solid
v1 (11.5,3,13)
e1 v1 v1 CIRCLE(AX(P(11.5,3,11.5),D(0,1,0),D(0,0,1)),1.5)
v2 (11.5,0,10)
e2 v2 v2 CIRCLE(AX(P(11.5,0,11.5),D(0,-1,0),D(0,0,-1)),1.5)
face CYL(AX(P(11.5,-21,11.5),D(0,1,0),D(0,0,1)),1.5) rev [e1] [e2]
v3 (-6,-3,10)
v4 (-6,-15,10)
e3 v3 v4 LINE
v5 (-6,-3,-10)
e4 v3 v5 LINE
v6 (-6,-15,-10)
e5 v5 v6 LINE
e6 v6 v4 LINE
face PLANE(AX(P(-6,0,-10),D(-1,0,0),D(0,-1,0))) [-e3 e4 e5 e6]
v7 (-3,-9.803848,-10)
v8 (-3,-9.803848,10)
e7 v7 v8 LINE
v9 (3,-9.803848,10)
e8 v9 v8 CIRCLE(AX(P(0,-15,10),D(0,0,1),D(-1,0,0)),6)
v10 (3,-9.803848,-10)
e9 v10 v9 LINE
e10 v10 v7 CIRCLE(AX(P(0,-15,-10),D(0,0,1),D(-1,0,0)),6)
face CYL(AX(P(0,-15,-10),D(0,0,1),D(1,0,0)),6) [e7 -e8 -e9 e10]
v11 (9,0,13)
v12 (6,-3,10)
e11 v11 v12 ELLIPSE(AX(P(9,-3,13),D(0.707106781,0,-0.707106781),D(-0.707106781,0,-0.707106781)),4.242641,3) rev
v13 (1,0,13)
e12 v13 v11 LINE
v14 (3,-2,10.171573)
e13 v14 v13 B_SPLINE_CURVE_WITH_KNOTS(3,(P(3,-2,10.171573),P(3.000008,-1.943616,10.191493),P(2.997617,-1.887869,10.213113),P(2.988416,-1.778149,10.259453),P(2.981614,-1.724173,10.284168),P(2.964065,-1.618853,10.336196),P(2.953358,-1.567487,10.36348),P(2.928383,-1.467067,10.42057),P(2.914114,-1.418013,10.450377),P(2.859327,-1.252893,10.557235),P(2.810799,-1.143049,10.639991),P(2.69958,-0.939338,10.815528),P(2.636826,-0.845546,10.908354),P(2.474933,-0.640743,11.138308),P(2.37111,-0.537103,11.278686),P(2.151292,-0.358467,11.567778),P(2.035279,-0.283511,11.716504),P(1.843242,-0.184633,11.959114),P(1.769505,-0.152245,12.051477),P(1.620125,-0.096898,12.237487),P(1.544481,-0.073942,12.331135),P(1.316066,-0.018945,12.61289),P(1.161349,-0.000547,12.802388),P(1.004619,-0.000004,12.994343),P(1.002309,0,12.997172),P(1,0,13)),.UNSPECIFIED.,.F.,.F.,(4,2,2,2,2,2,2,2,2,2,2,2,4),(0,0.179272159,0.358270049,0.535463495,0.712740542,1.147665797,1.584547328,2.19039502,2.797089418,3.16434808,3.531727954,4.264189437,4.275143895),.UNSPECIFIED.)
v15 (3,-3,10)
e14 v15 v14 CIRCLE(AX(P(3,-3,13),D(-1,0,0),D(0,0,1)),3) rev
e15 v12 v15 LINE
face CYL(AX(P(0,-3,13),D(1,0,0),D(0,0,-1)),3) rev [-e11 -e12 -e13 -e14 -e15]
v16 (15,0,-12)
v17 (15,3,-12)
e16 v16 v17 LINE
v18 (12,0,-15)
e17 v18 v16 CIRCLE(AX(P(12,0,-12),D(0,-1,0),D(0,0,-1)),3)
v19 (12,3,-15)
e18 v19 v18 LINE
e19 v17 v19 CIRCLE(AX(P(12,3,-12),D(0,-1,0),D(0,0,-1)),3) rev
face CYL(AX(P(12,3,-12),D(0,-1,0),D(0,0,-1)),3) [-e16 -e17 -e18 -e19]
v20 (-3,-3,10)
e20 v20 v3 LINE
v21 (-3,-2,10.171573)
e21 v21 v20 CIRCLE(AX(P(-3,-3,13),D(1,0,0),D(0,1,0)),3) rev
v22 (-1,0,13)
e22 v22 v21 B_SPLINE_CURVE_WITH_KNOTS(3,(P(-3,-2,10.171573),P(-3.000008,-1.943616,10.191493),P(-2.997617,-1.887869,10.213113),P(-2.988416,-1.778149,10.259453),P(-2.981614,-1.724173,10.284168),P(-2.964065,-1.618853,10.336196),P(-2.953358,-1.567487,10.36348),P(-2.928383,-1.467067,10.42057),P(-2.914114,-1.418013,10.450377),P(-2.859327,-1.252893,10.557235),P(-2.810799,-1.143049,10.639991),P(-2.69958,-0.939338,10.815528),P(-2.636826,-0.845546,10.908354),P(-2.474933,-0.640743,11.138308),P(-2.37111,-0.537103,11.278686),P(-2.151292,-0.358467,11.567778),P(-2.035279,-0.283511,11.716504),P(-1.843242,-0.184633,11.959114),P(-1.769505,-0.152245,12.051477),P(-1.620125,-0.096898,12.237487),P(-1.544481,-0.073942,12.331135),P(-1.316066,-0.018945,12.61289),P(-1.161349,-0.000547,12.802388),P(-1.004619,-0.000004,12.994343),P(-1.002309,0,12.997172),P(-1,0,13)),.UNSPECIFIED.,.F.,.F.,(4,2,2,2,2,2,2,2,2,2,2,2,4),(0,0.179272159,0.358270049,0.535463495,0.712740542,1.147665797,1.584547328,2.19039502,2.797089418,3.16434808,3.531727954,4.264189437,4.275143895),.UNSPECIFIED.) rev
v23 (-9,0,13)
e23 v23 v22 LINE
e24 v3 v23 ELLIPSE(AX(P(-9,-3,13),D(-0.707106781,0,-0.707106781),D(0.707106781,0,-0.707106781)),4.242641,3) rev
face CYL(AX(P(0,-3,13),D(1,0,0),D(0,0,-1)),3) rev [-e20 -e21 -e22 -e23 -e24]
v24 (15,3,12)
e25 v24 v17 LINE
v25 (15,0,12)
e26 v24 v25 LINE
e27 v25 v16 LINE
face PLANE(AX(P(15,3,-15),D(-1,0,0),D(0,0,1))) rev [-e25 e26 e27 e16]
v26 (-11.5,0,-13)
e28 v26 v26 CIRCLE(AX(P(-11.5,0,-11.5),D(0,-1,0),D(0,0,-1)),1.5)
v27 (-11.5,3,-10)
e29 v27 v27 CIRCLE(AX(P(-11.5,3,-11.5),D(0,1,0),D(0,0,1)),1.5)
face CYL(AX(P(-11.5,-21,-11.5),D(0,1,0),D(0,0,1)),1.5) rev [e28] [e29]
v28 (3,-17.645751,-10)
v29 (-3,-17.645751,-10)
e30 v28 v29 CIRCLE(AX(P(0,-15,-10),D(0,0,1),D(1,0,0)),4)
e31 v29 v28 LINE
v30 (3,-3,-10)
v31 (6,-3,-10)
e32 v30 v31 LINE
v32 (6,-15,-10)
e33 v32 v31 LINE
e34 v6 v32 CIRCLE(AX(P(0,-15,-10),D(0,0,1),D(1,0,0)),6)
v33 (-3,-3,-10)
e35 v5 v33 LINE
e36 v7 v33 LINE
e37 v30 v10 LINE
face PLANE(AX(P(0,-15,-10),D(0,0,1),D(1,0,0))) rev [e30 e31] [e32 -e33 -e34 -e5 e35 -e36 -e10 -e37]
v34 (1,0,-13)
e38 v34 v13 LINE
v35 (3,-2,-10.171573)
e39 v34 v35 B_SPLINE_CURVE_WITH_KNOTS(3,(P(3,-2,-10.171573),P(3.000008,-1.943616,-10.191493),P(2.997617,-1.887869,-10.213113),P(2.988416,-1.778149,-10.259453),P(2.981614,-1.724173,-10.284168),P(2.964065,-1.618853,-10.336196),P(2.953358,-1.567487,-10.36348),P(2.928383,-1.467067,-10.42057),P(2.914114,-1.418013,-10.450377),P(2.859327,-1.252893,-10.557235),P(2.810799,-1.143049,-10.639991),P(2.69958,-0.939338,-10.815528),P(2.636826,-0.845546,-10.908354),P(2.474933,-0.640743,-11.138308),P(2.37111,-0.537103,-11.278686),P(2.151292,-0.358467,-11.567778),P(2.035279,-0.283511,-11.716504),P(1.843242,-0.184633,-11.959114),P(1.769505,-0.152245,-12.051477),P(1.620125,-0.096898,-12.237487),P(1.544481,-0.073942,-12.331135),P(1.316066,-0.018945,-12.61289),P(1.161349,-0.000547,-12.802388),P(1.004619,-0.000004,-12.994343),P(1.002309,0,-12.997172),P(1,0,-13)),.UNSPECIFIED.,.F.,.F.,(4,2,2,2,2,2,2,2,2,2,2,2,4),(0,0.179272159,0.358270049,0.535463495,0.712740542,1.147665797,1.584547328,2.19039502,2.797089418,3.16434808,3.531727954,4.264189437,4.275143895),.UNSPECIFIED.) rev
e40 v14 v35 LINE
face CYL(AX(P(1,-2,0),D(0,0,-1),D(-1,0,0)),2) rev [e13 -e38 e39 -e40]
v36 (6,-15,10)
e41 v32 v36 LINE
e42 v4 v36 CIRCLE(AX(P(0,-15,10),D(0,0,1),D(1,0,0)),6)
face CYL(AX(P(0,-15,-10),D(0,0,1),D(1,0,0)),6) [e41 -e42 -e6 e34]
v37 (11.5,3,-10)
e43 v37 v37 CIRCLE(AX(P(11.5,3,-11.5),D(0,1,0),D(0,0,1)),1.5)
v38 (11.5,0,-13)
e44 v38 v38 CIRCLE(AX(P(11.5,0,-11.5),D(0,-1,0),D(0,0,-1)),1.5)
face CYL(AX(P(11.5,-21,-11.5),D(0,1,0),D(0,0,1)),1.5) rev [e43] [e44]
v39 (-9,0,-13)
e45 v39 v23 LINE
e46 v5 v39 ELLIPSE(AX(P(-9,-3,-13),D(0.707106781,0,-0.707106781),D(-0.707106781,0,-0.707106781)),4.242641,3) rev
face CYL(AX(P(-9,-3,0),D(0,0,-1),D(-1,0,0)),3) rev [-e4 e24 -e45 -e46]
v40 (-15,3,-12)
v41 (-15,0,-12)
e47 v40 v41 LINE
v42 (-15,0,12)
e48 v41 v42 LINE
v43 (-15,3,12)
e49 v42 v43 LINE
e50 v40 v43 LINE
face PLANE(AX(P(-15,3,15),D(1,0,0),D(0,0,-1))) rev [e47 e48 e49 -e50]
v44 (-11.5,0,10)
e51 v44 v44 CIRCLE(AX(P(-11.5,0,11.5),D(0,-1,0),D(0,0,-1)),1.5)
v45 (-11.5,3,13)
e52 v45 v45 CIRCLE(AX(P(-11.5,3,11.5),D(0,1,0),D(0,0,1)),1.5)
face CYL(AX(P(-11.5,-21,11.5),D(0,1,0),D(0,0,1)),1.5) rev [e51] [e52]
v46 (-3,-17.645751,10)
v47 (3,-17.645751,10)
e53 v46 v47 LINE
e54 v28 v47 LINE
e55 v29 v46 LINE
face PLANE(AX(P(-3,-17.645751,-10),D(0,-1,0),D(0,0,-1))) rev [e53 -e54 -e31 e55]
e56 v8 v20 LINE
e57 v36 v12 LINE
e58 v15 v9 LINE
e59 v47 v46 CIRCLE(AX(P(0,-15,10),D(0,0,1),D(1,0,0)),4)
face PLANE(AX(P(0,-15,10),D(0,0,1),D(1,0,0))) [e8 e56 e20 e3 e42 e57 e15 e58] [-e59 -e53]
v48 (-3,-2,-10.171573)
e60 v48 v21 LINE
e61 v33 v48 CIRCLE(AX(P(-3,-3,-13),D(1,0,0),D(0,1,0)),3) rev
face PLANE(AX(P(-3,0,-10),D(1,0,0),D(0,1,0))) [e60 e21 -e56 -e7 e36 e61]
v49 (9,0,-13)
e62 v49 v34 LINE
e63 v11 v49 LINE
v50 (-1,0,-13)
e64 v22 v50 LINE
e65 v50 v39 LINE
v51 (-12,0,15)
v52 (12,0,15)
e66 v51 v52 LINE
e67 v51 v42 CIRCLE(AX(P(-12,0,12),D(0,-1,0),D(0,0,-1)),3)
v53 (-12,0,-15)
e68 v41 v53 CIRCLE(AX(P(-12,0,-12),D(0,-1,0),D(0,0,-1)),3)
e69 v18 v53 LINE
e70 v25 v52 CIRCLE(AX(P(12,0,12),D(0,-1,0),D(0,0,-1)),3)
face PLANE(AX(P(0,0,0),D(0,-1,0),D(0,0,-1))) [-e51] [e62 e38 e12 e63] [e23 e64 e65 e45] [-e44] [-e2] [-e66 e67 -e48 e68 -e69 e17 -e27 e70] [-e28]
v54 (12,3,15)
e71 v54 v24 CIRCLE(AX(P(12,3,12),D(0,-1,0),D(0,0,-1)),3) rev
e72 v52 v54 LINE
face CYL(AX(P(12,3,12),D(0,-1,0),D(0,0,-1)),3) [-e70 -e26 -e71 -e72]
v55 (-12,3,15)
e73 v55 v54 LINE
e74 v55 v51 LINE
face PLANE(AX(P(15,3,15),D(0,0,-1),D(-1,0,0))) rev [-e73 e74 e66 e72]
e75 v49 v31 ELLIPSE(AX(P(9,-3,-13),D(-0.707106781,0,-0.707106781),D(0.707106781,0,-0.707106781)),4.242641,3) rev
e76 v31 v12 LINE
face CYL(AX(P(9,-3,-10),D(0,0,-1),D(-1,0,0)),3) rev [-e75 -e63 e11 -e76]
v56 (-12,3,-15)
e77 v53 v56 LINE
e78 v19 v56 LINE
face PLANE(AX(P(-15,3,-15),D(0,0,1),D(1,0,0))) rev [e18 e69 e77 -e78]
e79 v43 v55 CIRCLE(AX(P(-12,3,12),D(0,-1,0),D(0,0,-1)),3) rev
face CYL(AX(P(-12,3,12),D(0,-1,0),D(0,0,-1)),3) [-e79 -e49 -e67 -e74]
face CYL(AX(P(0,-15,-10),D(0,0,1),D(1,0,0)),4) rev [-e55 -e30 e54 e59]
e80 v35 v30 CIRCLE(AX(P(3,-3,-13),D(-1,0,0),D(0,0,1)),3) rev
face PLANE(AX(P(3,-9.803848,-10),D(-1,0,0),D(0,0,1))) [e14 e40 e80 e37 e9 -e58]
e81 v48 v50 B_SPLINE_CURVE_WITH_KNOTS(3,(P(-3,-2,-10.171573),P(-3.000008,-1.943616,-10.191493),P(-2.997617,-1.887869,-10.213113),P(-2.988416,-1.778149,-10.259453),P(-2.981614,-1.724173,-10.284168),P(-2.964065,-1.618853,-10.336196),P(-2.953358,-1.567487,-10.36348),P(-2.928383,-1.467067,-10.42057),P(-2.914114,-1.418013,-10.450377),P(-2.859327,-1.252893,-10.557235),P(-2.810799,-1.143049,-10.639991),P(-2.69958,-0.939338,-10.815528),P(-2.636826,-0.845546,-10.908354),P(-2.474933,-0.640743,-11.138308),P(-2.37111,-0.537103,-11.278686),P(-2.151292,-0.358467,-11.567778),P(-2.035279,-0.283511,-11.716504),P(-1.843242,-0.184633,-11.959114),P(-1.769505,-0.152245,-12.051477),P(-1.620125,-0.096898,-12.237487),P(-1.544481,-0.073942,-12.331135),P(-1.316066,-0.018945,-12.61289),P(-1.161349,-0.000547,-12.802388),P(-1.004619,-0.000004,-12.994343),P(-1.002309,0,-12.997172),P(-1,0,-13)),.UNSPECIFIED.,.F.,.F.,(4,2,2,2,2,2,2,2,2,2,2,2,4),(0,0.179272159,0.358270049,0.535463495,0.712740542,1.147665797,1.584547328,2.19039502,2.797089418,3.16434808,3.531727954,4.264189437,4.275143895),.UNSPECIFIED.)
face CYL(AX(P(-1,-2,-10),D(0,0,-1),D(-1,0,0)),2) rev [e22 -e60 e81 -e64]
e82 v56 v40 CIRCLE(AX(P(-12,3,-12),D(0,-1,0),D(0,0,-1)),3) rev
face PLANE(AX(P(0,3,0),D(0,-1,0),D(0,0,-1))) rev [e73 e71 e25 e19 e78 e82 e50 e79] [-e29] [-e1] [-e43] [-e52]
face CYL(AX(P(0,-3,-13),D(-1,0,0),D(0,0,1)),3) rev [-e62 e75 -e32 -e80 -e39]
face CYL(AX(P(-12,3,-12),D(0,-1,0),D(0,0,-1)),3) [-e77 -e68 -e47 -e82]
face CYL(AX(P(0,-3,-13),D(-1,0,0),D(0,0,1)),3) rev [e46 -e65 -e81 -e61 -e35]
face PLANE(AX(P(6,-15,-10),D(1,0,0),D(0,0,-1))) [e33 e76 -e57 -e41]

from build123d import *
from build123d.topology import SkipClean

# Parameters (mm, degrees)
CROQUIS1_W              = 30
CROQUIS1_H              = 30
SALIENTE_EXTRUIR1_DEPTH = 3
SALIENTE_EXTRUIR2_DEPTH = 20
CROQUIS4_R              = 1.5
CORTAR_EXTRUIR1_DEPTH   = 33.031234756
REDONDEO2_R             = 3
REDONDEO4_R             = 2
REDONDEO5_START         = -6
REDONDEO5_DEPTH         = 3
REDONDEO5_START_2       = 3
REDONDEO5_2_DEPTH       = 3
REDONDEO5_START_3       = -13.0000001
REDONDEO5_3_DEPTH       = 26.0000001
REDONDEO5_START_4       = -10
REDONDEO5_4_DEPTH       = 20


with BuildPart() as part:
    # Croquis1 → Saliente-Extruir1 (new body)
    with BuildSketch(Plane(origin=(0, 0, 0), x_dir=(1, 0, 0), z_dir=(0, 1, 0))):
        Rectangle(CROQUIS1_W, CROQUIS1_H)
    extrude(amount=SALIENTE_EXTRUIR1_DEPTH)

    # Croquis3 → Saliente-Extruir2 (add)
    with BuildSketch(Plane.XY.offset(10)):
        with BuildLine():
            Line((-3, 0), (-3, -9.803847577))
            ThreePointArc((-3, -9.803847577), (0, -9), (3, -9.803847577))
            Line((3, -9.803847577), (3, 0))
            Line((3, 0), (6, 0))
            Line((6, 0), (6, -15))
            ThreePointArc((6, -15), (0, -21), (-6, -15))
            Line((-6, -15), (-6, 0))
            Line((-6, 0), (-3, 0))
        make_face()
        with BuildLine():
            Line((-3, -17.645751311), (3, -17.645751311))
            ThreePointArc((3, -17.645751311), (0, -11), (-3, -17.645751311))
        make_face(mode=Mode.SUBTRACT)
    extrude(amount=-SALIENTE_EXTRUIR2_DEPTH)

    # Croquis4 → Cortar-Extruir1 (cut, through all)
    with BuildSketch(Plane(origin=(0, 3, 0), x_dir=(1, 0, 0), z_dir=(0, 1, 0))):
        with Locations(Location((-11.5, 11.5, 0), (0, 0, 270))):
            Circle(CROQUIS4_R)
        with Locations(Location((11.5, 11.5, 0), (0, 0, 270))):
            Circle(CROQUIS4_R)
        with Locations(Location((11.5, -11.5, 0), (0, 0, 270))):
            Circle(CROQUIS4_R)
        with Locations(Location((-11.5, -11.5, 0), (0, 0, 270))):
            Circle(CROQUIS4_R)
    extrude(amount=-CORTAR_EXTRUIR1_DEPTH, mode=Mode.SUBTRACT)

    # Redondeo2
    redondeo2_edges = [part.edges().sort_by_distance(p)[0] for p in [
        (-15, 1.5, -15),
        (15, 1.5, -15),
        (15, 1.5, 15),
        (-15, 1.5, 15),
    ]]
    fillet(redondeo2_edges, radius=REDONDEO2_R)

    # Redondeo4
    redondeo4_edges = [part.edges().sort_by_distance(p)[0] for p in [
        (-3, 0, 0),
        (3, 0, 0),
    ]]
    fillet(redondeo4_edges, radius=REDONDEO4_R)

    # Redondeo5: read off the stored shape, not the designer's step
    # Redondeo5 outline → Redondeo5 (add)
    with BuildSketch(Plane.YZ.offset(REDONDEO5_START)):
        with BuildLine():
            Line((0, -13), (0, -10))
            Line((0, -10), (-3, -10))
            ThreePointArc((-3, -10), (-0.878679656, -10.878679656), (0, -13))
        make_face()
        with BuildLine():
            ThreePointArc((0, 13), (-0.878679656, 10.878679656), (-3, 10))
            Line((-3, 10), (0, 10))
            Line((0, 10), (0, 13))
        make_face()
    extrude(amount=REDONDEO5_DEPTH)

    # Redondeo5 2 outline → Redondeo5 2 (add)
    with BuildSketch(Plane.YZ.offset(REDONDEO5_START_2)):
        with BuildLine():
            Line((0, -13), (0, -10))
            Line((0, -10), (-3, -10))
            ThreePointArc((-3, -10), (-0.878679656, -10.878679656), (0, -13))
        make_face()
        with BuildLine():
            ThreePointArc((0, 13), (-0.878679656, 10.878679656), (-3, 10))
            Line((-3, 10), (0, 10))
            Line((0, 10), (0, 13))
        make_face()
    extrude(amount=REDONDEO5_2_DEPTH)

    # Redondeo5 3 outline → Redondeo5 3 (add)
    with SkipClean():  # the faces are left unmerged after this step: merging them gives an invalid solid
        with BuildSketch(Plane.XY.offset(REDONDEO5_START_3)):
            with BuildLine():
                Line((-3, 0), (-3, -2))
                ThreePointArc((-3, -2), (-2.414213562, -0.585786438), (-1, 0))
                Line((-1, 0), (-3, 0))
            make_face()
            with BuildLine():
                Line((-6, -3), (-6, 0))
                Line((-6, 0), (-9, 0))
                ThreePointArc((-9, 0), (-6.878679656, -0.878679656), (-6, -3))
            make_face()
            with BuildLine():
                Line((9, 0), (6, 0))
                Line((6, 0), (6, -3))
                ThreePointArc((6, -3), (6.878679656, -0.878679656), (9, 0))
            make_face()
            with BuildLine():
                Line((3, 0), (1, 0))
                ThreePointArc((1, 0), (2.414213562, -0.585786438), (3, -2))
                Line((3, -2), (3, 0))
            make_face()
        extrude(amount=REDONDEO5_3_DEPTH)

    # Redondeo5 4 outline → Redondeo5 4 (cut)
    with SkipClean():  # the faces are left unmerged after this step: merging them gives an invalid solid
        with BuildSketch(Plane.YZ.offset(REDONDEO5_START_4)):
            with BuildLine():
                ThreePointArc((0, -13.00000005), (-0.878679638, -10.878679674), (-3, -10))
                Line((-3, -10), (-3, -13.0000001))
                Line((-3, -13.0000001), (0, -13.00000005))
            make_face()
            with BuildLine():
                Line((0, 13), (-3, 13))
                Line((-3, 13), (-3, 10))
                ThreePointArc((-3, 10), (-0.878679656, 10.878679656), (0, 13))
            make_face()
        extrude(amount=REDONDEO5_4_DEPTH, mode=Mode.SUBTRACT)


solid = part.part
